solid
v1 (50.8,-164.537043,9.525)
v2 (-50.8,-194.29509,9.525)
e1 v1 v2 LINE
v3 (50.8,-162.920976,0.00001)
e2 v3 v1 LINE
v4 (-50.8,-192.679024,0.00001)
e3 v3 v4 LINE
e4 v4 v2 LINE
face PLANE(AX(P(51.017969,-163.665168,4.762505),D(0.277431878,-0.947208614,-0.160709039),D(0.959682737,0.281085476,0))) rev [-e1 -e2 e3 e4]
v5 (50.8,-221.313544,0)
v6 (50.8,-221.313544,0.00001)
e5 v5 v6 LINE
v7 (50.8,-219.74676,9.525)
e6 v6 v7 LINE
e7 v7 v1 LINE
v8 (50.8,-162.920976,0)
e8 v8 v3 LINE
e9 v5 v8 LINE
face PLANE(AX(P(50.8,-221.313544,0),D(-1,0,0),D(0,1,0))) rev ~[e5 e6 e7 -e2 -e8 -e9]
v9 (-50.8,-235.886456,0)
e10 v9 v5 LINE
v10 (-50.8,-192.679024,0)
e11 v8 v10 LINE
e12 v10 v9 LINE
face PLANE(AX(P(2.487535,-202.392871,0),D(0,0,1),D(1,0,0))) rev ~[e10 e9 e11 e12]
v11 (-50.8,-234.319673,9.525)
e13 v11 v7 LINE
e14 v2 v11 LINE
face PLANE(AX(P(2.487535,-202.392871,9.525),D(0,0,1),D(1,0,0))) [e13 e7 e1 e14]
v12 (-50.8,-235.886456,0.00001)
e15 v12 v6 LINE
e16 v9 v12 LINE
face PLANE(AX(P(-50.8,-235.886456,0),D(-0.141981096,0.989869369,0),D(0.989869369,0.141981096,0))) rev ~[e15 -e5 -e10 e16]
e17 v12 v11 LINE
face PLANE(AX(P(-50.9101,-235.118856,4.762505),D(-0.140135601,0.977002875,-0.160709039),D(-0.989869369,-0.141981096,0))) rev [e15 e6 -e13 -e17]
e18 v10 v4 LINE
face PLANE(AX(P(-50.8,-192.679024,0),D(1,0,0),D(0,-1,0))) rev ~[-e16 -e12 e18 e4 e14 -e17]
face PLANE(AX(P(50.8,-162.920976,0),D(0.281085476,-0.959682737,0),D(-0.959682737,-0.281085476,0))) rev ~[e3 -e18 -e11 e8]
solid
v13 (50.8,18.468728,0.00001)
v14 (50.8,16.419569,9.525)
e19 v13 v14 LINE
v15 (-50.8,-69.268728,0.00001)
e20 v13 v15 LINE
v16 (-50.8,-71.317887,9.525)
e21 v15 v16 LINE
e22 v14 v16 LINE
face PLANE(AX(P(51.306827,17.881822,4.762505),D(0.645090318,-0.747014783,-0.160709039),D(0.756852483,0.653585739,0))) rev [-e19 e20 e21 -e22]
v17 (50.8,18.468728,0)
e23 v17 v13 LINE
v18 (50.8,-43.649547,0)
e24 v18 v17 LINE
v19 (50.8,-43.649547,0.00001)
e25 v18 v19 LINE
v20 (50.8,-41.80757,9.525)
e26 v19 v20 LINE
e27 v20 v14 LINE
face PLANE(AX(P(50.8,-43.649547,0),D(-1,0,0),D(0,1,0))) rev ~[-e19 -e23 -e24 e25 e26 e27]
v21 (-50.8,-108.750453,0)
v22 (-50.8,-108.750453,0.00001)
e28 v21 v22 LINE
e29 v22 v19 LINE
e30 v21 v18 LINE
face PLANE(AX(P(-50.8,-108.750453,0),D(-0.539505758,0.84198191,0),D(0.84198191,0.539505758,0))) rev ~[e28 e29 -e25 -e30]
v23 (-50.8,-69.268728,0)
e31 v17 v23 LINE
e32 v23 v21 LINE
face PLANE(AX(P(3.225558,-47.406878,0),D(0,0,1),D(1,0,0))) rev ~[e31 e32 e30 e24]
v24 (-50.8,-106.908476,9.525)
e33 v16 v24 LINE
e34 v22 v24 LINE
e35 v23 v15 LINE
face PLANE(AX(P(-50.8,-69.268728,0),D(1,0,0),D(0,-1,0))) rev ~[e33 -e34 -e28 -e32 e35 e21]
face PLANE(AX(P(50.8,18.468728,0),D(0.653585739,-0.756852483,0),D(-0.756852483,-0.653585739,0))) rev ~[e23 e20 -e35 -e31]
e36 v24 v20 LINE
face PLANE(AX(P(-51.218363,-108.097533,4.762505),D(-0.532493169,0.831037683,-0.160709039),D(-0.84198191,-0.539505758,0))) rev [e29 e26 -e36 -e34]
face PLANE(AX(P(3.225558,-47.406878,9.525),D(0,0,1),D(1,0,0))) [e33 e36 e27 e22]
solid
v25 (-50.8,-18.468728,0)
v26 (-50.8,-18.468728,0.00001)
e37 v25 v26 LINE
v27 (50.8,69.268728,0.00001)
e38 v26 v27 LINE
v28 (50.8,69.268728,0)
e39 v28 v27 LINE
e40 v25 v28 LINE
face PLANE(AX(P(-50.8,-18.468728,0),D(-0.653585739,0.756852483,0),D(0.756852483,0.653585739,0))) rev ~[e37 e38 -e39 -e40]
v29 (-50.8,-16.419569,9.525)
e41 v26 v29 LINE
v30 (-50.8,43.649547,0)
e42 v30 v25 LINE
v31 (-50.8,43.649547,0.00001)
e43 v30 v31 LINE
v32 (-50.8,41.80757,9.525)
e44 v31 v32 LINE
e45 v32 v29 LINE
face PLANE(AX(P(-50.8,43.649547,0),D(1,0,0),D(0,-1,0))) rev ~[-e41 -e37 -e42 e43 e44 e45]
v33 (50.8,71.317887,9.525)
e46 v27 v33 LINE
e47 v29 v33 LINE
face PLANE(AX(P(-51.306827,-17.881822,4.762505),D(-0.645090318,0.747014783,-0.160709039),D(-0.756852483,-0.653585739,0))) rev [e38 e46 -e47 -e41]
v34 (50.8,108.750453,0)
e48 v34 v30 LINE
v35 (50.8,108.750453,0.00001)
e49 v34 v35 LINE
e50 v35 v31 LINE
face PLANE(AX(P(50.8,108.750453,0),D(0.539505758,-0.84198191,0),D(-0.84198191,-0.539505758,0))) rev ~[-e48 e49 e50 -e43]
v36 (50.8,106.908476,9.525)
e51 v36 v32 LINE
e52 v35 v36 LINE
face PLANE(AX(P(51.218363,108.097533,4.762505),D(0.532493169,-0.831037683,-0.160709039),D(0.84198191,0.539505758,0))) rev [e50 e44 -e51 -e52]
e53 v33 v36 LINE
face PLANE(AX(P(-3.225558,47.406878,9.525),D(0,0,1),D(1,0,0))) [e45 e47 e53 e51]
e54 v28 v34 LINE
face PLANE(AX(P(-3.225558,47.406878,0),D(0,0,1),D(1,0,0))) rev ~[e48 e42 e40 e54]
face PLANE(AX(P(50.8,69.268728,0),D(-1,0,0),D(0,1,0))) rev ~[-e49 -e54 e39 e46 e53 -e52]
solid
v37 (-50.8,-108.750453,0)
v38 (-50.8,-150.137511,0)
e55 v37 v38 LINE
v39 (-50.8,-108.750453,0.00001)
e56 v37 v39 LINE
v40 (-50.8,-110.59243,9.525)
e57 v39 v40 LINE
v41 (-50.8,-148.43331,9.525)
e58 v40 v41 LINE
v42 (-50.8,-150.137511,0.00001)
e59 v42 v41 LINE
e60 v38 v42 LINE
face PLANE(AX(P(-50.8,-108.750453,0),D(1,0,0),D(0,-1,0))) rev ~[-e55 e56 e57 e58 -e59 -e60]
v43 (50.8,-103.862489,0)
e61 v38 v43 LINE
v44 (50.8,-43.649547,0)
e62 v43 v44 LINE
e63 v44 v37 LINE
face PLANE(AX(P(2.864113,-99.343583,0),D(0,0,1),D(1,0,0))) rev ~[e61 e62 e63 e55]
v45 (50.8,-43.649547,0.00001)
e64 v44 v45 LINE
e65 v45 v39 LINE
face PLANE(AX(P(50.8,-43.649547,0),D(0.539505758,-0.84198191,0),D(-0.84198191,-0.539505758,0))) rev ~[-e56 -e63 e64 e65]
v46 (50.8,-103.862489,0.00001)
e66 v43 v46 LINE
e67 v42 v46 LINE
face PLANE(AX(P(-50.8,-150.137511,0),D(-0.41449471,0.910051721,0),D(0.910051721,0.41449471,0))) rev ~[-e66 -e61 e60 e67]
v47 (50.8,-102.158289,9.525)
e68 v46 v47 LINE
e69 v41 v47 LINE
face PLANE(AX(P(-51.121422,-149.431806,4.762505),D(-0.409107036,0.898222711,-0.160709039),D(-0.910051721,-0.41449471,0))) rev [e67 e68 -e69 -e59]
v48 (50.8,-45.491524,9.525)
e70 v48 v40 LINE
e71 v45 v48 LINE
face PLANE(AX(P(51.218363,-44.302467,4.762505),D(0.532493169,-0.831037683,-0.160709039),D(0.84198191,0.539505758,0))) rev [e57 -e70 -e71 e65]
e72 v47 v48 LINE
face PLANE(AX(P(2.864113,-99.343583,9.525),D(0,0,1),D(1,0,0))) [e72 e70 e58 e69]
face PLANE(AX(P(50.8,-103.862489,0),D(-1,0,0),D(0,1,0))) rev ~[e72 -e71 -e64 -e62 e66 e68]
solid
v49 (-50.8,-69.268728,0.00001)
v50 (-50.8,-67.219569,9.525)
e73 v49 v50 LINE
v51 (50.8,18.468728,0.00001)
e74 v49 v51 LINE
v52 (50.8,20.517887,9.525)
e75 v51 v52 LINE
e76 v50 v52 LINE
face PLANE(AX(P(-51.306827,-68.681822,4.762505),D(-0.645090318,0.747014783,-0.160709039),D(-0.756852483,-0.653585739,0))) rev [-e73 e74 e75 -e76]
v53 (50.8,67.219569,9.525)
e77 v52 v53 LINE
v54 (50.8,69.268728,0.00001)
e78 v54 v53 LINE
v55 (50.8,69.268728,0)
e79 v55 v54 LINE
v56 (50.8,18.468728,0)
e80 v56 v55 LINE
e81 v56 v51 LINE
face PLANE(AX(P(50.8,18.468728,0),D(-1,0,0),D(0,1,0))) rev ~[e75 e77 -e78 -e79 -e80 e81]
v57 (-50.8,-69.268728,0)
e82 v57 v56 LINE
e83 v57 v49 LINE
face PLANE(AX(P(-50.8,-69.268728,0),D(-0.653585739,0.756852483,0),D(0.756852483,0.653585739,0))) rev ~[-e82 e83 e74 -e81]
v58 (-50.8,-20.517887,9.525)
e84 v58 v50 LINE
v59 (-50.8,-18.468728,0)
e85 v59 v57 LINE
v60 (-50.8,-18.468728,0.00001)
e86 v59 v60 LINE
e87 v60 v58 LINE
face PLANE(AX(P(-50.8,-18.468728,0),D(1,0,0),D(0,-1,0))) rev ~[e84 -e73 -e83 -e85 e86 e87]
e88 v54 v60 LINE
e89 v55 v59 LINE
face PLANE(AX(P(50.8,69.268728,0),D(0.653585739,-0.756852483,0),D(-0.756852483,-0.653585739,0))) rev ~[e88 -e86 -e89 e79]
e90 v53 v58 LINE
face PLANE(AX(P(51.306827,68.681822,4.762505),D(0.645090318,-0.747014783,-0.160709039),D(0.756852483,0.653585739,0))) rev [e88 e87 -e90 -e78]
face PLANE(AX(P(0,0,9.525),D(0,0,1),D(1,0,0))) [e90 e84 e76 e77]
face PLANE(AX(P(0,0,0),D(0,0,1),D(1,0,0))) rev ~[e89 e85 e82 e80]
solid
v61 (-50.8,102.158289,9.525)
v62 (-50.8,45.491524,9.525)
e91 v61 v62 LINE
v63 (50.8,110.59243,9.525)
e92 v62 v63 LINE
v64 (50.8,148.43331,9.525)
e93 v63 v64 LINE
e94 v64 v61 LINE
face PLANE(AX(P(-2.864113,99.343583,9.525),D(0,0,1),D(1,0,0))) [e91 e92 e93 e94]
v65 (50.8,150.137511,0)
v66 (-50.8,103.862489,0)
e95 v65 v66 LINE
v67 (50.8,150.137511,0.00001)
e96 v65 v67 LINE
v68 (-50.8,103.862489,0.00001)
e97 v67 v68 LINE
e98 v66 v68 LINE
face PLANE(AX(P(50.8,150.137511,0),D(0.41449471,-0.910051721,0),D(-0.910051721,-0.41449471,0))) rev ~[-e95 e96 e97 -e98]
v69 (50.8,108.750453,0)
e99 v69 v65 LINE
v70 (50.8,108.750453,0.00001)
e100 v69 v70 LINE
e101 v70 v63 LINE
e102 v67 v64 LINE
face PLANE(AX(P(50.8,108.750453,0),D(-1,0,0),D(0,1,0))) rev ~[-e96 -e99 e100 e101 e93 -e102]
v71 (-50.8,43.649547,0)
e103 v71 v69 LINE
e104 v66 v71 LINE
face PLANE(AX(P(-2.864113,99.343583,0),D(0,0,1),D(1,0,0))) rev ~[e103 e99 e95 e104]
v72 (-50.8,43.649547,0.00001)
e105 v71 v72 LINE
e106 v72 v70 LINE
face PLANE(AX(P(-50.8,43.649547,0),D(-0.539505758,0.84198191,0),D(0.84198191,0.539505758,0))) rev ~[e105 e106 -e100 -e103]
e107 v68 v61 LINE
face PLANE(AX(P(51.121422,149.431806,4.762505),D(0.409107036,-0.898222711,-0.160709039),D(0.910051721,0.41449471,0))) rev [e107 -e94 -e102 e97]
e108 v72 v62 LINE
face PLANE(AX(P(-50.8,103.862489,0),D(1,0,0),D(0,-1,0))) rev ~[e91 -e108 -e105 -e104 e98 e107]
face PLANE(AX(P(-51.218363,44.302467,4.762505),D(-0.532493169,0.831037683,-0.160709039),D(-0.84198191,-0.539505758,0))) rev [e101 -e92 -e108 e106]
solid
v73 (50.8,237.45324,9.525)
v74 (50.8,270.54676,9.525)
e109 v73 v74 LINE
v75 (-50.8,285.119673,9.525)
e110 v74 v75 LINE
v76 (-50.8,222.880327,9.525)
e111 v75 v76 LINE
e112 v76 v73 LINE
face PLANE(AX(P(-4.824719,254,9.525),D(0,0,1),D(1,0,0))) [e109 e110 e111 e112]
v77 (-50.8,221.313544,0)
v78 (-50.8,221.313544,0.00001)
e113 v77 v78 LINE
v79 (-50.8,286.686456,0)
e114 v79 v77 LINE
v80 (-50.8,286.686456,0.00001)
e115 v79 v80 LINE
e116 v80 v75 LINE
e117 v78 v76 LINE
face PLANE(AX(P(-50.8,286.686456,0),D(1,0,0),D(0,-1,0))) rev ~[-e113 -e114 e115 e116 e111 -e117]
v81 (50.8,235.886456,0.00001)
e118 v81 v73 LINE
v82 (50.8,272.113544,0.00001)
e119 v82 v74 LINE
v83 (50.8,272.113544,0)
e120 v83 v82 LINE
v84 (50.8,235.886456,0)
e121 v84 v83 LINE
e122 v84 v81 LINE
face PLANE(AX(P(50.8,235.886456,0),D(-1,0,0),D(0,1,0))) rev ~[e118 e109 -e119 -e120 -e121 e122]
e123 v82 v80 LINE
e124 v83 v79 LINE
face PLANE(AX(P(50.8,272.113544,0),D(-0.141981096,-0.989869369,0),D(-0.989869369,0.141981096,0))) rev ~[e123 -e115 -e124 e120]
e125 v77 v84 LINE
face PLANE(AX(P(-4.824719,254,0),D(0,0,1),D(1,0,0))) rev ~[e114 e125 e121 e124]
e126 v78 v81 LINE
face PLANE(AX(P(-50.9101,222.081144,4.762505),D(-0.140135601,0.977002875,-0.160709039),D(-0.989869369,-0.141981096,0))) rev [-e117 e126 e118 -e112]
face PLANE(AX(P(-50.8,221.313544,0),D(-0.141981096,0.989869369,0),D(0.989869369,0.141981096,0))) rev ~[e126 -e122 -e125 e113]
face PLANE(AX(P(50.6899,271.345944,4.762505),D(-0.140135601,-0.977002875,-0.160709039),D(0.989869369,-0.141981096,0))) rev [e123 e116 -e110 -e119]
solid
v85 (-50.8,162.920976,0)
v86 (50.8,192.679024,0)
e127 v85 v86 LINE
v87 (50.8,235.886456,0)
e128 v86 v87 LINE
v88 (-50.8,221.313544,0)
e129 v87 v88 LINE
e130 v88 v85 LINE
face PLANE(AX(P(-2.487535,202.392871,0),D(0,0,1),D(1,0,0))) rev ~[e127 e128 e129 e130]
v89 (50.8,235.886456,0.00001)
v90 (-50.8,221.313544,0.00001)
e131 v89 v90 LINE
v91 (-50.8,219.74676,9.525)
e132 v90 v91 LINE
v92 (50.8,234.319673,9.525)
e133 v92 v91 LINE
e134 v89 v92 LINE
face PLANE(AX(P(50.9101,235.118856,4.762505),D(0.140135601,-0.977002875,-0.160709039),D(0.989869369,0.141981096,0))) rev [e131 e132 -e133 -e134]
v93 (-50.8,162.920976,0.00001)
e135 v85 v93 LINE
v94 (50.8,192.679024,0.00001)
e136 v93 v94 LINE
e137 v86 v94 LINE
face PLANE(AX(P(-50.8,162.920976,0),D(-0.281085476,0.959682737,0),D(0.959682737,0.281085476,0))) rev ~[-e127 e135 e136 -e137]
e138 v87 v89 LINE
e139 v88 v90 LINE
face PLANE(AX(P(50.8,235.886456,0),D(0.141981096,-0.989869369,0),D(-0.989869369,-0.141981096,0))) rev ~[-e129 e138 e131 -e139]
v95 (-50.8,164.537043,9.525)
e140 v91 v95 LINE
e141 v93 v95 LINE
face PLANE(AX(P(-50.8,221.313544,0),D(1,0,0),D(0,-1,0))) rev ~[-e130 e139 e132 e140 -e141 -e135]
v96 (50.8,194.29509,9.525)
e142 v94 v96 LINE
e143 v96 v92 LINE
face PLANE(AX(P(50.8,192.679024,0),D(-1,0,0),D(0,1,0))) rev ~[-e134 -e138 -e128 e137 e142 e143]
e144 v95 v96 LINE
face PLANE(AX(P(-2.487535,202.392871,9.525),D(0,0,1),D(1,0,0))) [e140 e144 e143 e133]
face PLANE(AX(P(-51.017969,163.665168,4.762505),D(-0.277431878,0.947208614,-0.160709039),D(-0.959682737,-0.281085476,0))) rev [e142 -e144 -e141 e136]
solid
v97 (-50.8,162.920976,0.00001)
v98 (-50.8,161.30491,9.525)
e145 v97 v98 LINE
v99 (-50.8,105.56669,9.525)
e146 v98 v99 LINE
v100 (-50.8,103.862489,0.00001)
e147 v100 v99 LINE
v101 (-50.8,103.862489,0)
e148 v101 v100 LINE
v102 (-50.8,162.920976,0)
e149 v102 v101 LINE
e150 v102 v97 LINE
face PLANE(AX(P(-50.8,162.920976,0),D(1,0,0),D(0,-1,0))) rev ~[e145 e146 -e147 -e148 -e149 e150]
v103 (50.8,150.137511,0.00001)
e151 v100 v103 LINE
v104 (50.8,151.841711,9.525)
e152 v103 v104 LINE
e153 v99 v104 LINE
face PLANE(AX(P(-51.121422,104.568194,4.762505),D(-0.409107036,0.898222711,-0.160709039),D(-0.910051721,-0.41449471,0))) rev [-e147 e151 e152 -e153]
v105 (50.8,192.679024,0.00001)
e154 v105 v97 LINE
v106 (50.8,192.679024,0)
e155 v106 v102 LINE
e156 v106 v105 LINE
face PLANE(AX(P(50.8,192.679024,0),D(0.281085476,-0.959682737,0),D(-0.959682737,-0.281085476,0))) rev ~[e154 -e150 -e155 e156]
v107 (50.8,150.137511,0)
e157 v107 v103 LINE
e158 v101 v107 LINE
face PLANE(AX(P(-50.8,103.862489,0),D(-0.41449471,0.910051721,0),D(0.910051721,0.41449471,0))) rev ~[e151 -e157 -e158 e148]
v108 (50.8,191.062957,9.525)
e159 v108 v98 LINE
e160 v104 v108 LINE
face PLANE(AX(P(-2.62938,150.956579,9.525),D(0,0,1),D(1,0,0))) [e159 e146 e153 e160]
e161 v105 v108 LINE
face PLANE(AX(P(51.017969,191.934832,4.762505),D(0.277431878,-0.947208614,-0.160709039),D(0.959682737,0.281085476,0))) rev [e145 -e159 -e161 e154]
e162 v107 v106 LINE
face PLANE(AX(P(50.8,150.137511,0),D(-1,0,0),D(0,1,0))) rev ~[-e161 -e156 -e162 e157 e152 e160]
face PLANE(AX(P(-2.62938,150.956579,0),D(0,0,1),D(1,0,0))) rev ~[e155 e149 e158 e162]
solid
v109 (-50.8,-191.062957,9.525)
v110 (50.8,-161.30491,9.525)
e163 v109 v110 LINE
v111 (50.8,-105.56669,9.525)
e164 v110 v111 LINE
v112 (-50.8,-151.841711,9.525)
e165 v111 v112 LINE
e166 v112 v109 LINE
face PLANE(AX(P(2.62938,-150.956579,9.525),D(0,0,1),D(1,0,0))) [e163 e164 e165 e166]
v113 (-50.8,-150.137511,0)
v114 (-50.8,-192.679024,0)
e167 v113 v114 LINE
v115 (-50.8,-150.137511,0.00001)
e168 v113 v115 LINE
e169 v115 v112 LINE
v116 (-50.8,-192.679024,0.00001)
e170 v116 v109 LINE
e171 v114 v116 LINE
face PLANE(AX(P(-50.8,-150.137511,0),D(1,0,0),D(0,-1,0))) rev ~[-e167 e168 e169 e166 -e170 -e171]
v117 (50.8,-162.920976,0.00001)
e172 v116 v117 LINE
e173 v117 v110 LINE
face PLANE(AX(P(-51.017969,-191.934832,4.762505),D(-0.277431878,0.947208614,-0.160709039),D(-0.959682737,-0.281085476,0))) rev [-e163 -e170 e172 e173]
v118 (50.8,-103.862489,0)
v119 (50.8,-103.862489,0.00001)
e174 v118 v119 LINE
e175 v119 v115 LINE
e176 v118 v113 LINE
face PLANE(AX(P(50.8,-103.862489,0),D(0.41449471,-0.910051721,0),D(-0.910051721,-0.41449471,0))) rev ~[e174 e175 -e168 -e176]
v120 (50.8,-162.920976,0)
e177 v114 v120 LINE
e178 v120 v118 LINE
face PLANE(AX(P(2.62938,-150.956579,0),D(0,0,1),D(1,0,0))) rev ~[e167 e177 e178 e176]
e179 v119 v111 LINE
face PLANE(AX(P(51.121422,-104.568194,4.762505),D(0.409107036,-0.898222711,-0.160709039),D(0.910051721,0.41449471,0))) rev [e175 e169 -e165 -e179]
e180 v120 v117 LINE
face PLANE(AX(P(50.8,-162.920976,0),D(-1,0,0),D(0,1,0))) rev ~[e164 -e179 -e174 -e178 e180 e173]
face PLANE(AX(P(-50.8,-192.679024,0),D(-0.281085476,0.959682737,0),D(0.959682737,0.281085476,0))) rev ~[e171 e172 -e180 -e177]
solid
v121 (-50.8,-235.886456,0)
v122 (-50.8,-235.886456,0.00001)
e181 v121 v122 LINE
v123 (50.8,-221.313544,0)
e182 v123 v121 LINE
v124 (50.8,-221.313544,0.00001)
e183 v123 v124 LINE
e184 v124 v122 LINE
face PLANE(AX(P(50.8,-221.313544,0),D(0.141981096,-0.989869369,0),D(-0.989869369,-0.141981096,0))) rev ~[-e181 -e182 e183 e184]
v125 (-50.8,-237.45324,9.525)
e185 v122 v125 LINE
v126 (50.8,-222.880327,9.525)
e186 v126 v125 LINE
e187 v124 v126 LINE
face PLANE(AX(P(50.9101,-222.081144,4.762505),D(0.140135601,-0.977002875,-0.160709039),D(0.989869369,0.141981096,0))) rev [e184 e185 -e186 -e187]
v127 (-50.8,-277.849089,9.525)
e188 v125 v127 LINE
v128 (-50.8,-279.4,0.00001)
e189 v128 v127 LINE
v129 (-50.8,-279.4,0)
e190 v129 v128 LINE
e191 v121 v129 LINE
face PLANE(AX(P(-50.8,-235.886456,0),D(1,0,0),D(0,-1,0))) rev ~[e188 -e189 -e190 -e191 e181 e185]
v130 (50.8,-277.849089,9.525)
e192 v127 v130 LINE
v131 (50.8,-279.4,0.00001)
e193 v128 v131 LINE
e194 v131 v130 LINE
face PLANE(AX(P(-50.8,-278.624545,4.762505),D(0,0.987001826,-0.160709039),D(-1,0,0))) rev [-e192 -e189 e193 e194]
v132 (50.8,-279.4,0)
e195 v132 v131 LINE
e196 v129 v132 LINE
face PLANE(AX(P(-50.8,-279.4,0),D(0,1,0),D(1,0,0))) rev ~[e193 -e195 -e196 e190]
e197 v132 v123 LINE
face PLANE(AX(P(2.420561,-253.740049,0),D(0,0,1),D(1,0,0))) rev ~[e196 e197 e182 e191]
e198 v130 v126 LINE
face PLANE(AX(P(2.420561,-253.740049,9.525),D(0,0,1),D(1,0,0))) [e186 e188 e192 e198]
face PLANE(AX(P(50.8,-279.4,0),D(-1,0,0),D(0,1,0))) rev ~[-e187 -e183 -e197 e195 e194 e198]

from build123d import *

# Parameters (mm, degrees)
F2_DEPTH    = 9.525
F3_DEPTH    = 9.525
F4_DEPTH    = 9.525
F5_DEPTH    = 9.525
F6_DEPTH    = 9.525
F7_DEPTH    = 9.525
F8_DEPTH    = 9.525
F9_DEPTH    = 9.525
F10_DEPTH   = 9.525
F11_DEPTH   = 9.525
F12_DEPTH   = 9.525
F13_SIZE2   = 1.550911
F13_SIZE    = 9.52499
F13_2_SIZE2 = 1.550911
F13_2_SIZE  = 9.52499
F14_SIZE2   = 1.550911
F14_SIZE    = 9.52499
F14_2_SIZE2 = 1.550911
F14_2_SIZE  = 9.52499
F15_SIZE2   = 1.550911
F15_SIZE    = 9.52499
F15_2_SIZE2 = 1.550911
F15_2_SIZE  = 9.52499
F16_SIZE2   = 1.550911
F16_SIZE    = 9.52499
F16_2_SIZE2 = 1.550911
F16_2_SIZE  = 9.52499
F17_SIZE2   = 1.550911
F17_SIZE    = 9.52499
F17_2_SIZE2 = 1.550911
F17_2_SIZE  = 9.52499
F18_SIZE2   = 1.550911
F18_SIZE    = 9.52499
F18_2_SIZE2 = 1.550911
F18_2_SIZE  = 9.52499
F19_SIZE2   = 1.550911
F19_SIZE    = 9.52499
F19_2_SIZE2 = 1.550911
F19_2_SIZE  = 9.52499
F20_SIZE2   = 1.550911
F20_SIZE    = 9.52499
F20_2_SIZE2 = 1.550911
F20_2_SIZE  = 9.52499
F21_SIZE2   = 1.550911
F21_SIZE    = 9.52499
F21_2_SIZE2 = 1.550911
F21_2_SIZE  = 9.52499
F22_SIZE2   = 1.550911
F22_SIZE    = 9.52499
F22_2_SIZE2 = 1.550911
F22_2_SIZE  = 9.52499
F23_SIZE2   = 1.550911
F23_SIZE    = 9.52499
F23_2_SIZE2 = 1.550911
F23_2_SIZE  = 9.52499


# Not quite as in the source:
# - a fillet or chamfer is up to 0.001 mm smaller than in the source, because OpenCascade refuses the exact size


with BuildPart() as f2:
    # F1 (on Top) → F2 (new body)
    with BuildSketch(Plane.XY):
        Polygon((-50.8, 279.4), (-50.8, 221.3135439188), (50.8, 235.8864560812), (50.8, 272.1135439188), (-50.8, 286.6864560812), align=None)
    extrude(amount=F2_DEPTH)

    # F13 (size 9.525 and 1.5509205186 in the source; OpenCascade refuses exactly that, so slightly less here)
    f13_edges = [f2.edges().sort_by_distance(p)[0] for p in [
        (0, 228.6, 9.525),
    ]]
    f13_side = f2.faces().sort_by_distance((0, 228.6, 4.7625))[0]
    chamfer(f13_edges, length=F13_SIZE, length2=F13_SIZE2, reference=f13_side)

    # F13#2 (size 9.525 and 1.5509205186 in the source; OpenCascade refuses exactly that, so slightly less here)
    f13_2_edges = [f2.edges().sort_by_distance(p)[0] for p in [
        (0, 279.4, 9.525),
    ]]
    f13_2_side = f2.faces().sort_by_distance((0, 279.4, 4.7625))[0]
    chamfer(f13_2_edges, length=F13_2_SIZE, length2=F13_2_SIZE2, reference=f13_2_side)


with BuildPart() as f3:
    # F1 (on Top) → F3 (new body)
    with BuildSketch(Plane.XY):
        Polygon((-50.8, 221.3135439188), (-50.8, 162.9209762891), (50.8, 192.6790237109), (50.8, 235.8864560812), align=None)
    extrude(amount=F3_DEPTH)

    # F14 (size 9.525 and 1.5509205186 in the source; OpenCascade refuses exactly that, so slightly less here)
    f14_edges = [f3.edges().sort_by_distance(p)[0] for p in [
        (0, 228.6, 9.525),
    ]]
    f14_side = f3.faces().sort_by_distance((0, 228.6, 4.7625))[0]
    chamfer(f14_edges, length=F14_SIZE, length2=F14_SIZE2, reference=f14_side)

    # F14#2 (size 9.525 and 1.5509205186 in the source; OpenCascade refuses exactly that, so slightly less here)
    f14_2_edges = [f3.edges().sort_by_distance(p)[0] for p in [
        (0, 177.8, 9.525),
    ]]
    f14_2_side = f3.faces().sort_by_distance((0, 177.8, 4.7625))[0]
    chamfer(f14_2_edges, length=F14_2_SIZE, length2=F14_2_SIZE2, reference=f14_2_side)


with BuildPart() as f4:
    # F1 (on Top) → F4 (new body)
    with BuildSketch(Plane.XY):
        Polygon((-50.8, 162.9209762891), (-50.8, 103.8624894848), (50.8, 150.1375105152), (50.8, 192.6790237109), align=None)
    extrude(amount=F4_DEPTH)

    # F15 (size 9.525 and 1.5509205186 in the source; OpenCascade refuses exactly that, so slightly less here)
    f15_edges = [f4.edges().sort_by_distance(p)[0] for p in [
        (0, 177.8, 9.525),
    ]]
    f15_side = f4.faces().sort_by_distance((0, 177.8, 4.7625))[0]
    chamfer(f15_edges, length=F15_SIZE, length2=F15_SIZE2, reference=f15_side)

    # F15#2 (size 9.525 and 1.5509205186 in the source; OpenCascade refuses exactly that, so slightly less here)
    f15_2_edges = [f4.edges().sort_by_distance(p)[0] for p in [
        (0, 127, 9.525),
    ]]
    f15_2_side = f4.faces().sort_by_distance((0, 127, 4.7625))[0]
    chamfer(f15_2_edges, length=F15_2_SIZE, length2=F15_2_SIZE2, reference=f15_2_side)


with BuildPart() as f5:
    # F1 (on Top) → F5 (new body)
    with BuildSketch(Plane.XY):
        Polygon((-50.8, 103.8624894848), (-50.8, 43.64954709), (50.8, 108.75045291), (50.8, 150.1375105152), align=None)
    extrude(amount=F5_DEPTH)

    # F16 (size 9.525 and 1.5509205186 in the source; OpenCascade refuses exactly that, so slightly less here)
    f16_edges = [f5.edges().sort_by_distance(p)[0] for p in [
        (0, 127, 9.525),
    ]]
    f16_side = f5.faces().sort_by_distance((0, 127, 4.7625))[0]
    chamfer(f16_edges, length=F16_SIZE, length2=F16_SIZE2, reference=f16_side)

    # F16#2 (size 9.525 and 1.5509205186 in the source; OpenCascade refuses exactly that, so slightly less here)
    f16_2_edges = [f5.edges().sort_by_distance(p)[0] for p in [
        (0, 76.2, 9.525),
    ]]
    f16_2_side = f5.faces().sort_by_distance((0, 76.2, 4.7625))[0]
    chamfer(f16_2_edges, length=F16_2_SIZE, length2=F16_2_SIZE2, reference=f16_2_side)


with BuildPart() as f6:
    # F1 (on Top) → F6 (new body)
    with BuildSketch(Plane.XY):
        Polygon((-50.8, 43.64954709), (-50.8, -18.4687277608), (50.8, 69.2687277608), (50.8, 108.75045291), align=None)
    extrude(amount=F6_DEPTH)

    # F17 (size 9.525 and 1.5509205186 in the source; OpenCascade refuses exactly that, so slightly less here)
    f17_edges = [f6.edges().sort_by_distance(p)[0] for p in [
        (0, 25.4, 9.525),
    ]]
    f17_side = f6.faces().sort_by_distance((0, 25.4, 4.7625))[0]
    chamfer(f17_edges, length=F17_SIZE, length2=F17_SIZE2, reference=f17_side)

    # F17#2 (size 9.525 and 1.5509205186 in the source; OpenCascade refuses exactly that, so slightly less here)
    f17_2_edges = [f6.edges().sort_by_distance(p)[0] for p in [
        (0, 76.2, 9.525),
    ]]
    f17_2_side = f6.faces().sort_by_distance((0, 76.2, 4.7625))[0]
    chamfer(f17_2_edges, length=F17_2_SIZE, length2=F17_2_SIZE2, reference=f17_2_side)


with BuildPart() as f7:
    # F1 (on Top) → F7 (new body)
    with BuildSketch(Plane.XY):
        Polygon((-50.8, -18.4687277608), (-50.8, -69.2687277608), (50.8, 18.4687277608), (50.8, 69.2687277608), align=None)
    extrude(amount=F7_DEPTH)

    # F18 (size 9.525 and 1.5509205186 in the source; OpenCascade refuses exactly that, so slightly less here)
    f18_edges = [f7.edges().sort_by_distance(p)[0] for p in [
        (0, 25.4, 9.525),
    ]]
    f18_side = f7.faces().sort_by_distance((0, 25.4, 4.7625))[0]
    chamfer(f18_edges, length=F18_SIZE, length2=F18_SIZE2, reference=f18_side)

    # F18#2 (size 9.525 and 1.5509205186 in the source; OpenCascade refuses exactly that, so slightly less here)
    f18_2_edges = [f7.edges().sort_by_distance(p)[0] for p in [
        (0, -25.4, 9.525),
    ]]
    f18_2_side = f7.faces().sort_by_distance((0, -25.4, 4.7625))[0]
    chamfer(f18_2_edges, length=F18_2_SIZE, length2=F18_2_SIZE2, reference=f18_2_side)


with BuildPart() as f8:
    # F1 (on Top) → F8 (new body)
    with BuildSketch(Plane.XY):
        Polygon((-50.8, -69.2687277608), (-50.8, -108.75045291), (50.8, -43.64954709), (50.8, 18.4687277608), align=None)
    extrude(amount=F8_DEPTH)

    # F19 (size 9.525 and 1.5509205186 in the source; OpenCascade refuses exactly that, so slightly less here)
    f19_edges = [f8.edges().sort_by_distance(p)[0] for p in [
        (0, -25.4, 9.525),
    ]]
    f19_side = f8.faces().sort_by_distance((0, -25.4, 4.7625))[0]
    chamfer(f19_edges, length=F19_SIZE, length2=F19_SIZE2, reference=f19_side)

    # F19#2 (size 9.525 and 1.5509205186 in the source; OpenCascade refuses exactly that, so slightly less here)
    f19_2_edges = [f8.edges().sort_by_distance(p)[0] for p in [
        (0, -76.2, 9.525),
    ]]
    f19_2_side = f8.faces().sort_by_distance((0, -76.2, 4.7625))[0]
    chamfer(f19_2_edges, length=F19_2_SIZE, length2=F19_2_SIZE2, reference=f19_2_side)


with BuildPart() as f9:
    # F1 (on Top) → F9 (new body)
    with BuildSketch(Plane.XY):
        Polygon((-50.8, -108.75045291), (-50.8, -150.1375105152), (50.8, -103.8624894848), (50.8, -43.64954709), align=None)
    extrude(amount=F9_DEPTH)

    # F20 (size 9.525 and 1.5509205186 in the source; OpenCascade refuses exactly that, so slightly less here)
    f20_edges = [f9.edges().sort_by_distance(p)[0] for p in [
        (0, -76.2, 9.525),
    ]]
    f20_side = f9.faces().sort_by_distance((0, -76.2, 4.7625))[0]
    chamfer(f20_edges, length=F20_SIZE, length2=F20_SIZE2, reference=f20_side)

    # F20#2 (size 9.525 and 1.5509205186 in the source; OpenCascade refuses exactly that, so slightly less here)
    f20_2_edges = [f9.edges().sort_by_distance(p)[0] for p in [
        (0, -127, 9.525),
    ]]
    f20_2_side = f9.faces().sort_by_distance((0, -127, 4.7625))[0]
    chamfer(f20_2_edges, length=F20_2_SIZE, length2=F20_2_SIZE2, reference=f20_2_side)


with BuildPart() as f10:
    # F1 (on Top) → F10 (new body)
    with BuildSketch(Plane.XY):
        Polygon((-50.8, -150.1375105152), (-50.8, -192.6790237109), (50.8, -162.9209762891), (50.8, -103.8624894848), align=None)
    extrude(amount=F10_DEPTH)

    # F21 (size 9.525 and 1.5509205186 in the source; OpenCascade refuses exactly that, so slightly less here)
    f21_edges = [f10.edges().sort_by_distance(p)[0] for p in [
        (0, -127, 9.525),
    ]]
    f21_side = f10.faces().sort_by_distance((0, -127, 4.7625))[0]
    chamfer(f21_edges, length=F21_SIZE, length2=F21_SIZE2, reference=f21_side)

    # F21#2 (size 9.525 and 1.5509205186 in the source; OpenCascade refuses exactly that, so slightly less here)
    f21_2_edges = [f10.edges().sort_by_distance(p)[0] for p in [
        (0, -177.8, 9.525),
    ]]
    f21_2_side = f10.faces().sort_by_distance((0, -177.8, 4.7625))[0]
    chamfer(f21_2_edges, length=F21_2_SIZE, length2=F21_2_SIZE2, reference=f21_2_side)


with BuildPart() as f11:
    # F1 (on Top) → F11 (new body)
    with BuildSketch(Plane.XY):
        Polygon((-50.8, -192.6790237109), (-50.8, -235.8864560812), (50.8, -221.3135439188), (50.8, -162.9209762891), align=None)
    extrude(amount=F11_DEPTH)

    # F22 (size 9.525 and 1.5509205186 in the source; OpenCascade refuses exactly that, so slightly less here)
    f22_edges = [f11.edges().sort_by_distance(p)[0] for p in [
        (0, -177.8, 9.525),
    ]]
    f22_side = f11.faces().sort_by_distance((0, -177.8, 4.7625))[0]
    chamfer(f22_edges, length=F22_SIZE, length2=F22_SIZE2, reference=f22_side)

    # F22#2 (size 9.525 and 1.5509205186 in the source; OpenCascade refuses exactly that, so slightly less here)
    f22_2_edges = [f11.edges().sort_by_distance(p)[0] for p in [
        (0, -228.6, 9.525),
    ]]
    f22_2_side = f11.faces().sort_by_distance((0, -228.6, 4.7625))[0]
    chamfer(f22_2_edges, length=F22_2_SIZE, length2=F22_2_SIZE2, reference=f22_2_side)


with BuildPart() as f12:
    # F1 (on Top) → F12 (new body)
    with BuildSketch(Plane.XY):
        Polygon((-50.8, -235.8864560812), (-50.8, -279.4), (50.8, -279.4), (50.8, -221.3135439188), align=None)
    extrude(amount=F12_DEPTH)

    # F23 (size 9.525 and 1.5509205186 in the source; OpenCascade refuses exactly that, so slightly less here)
    f23_edges = [f12.edges().sort_by_distance(p)[0] for p in [
        (0, -228.6, 9.525),
    ]]
    f23_side = f12.faces().sort_by_distance((0, -228.6, 4.7625))[0]
    chamfer(f23_edges, length=F23_SIZE, length2=F23_SIZE2, reference=f23_side)

    # F23#2 (size 9.525 and 1.5509205186 in the source; OpenCascade refuses exactly that, so slightly less here)
    f23_2_edges = [f12.edges().sort_by_distance(p)[0] for p in [
        (0, -279.4, 9.525),
    ]]
    f23_2_side = f12.faces().sort_by_distance((0, -279.4, 4.7625))[0]
    chamfer(f23_2_edges, length=F23_2_SIZE, length2=F23_2_SIZE2, reference=f23_2_side)


solid = Compound([f2.part, f3.part, f4.part, f5.part, f6.part, f7.part, f8.part, f9.part, f10.part, f11.part, f12.part])
